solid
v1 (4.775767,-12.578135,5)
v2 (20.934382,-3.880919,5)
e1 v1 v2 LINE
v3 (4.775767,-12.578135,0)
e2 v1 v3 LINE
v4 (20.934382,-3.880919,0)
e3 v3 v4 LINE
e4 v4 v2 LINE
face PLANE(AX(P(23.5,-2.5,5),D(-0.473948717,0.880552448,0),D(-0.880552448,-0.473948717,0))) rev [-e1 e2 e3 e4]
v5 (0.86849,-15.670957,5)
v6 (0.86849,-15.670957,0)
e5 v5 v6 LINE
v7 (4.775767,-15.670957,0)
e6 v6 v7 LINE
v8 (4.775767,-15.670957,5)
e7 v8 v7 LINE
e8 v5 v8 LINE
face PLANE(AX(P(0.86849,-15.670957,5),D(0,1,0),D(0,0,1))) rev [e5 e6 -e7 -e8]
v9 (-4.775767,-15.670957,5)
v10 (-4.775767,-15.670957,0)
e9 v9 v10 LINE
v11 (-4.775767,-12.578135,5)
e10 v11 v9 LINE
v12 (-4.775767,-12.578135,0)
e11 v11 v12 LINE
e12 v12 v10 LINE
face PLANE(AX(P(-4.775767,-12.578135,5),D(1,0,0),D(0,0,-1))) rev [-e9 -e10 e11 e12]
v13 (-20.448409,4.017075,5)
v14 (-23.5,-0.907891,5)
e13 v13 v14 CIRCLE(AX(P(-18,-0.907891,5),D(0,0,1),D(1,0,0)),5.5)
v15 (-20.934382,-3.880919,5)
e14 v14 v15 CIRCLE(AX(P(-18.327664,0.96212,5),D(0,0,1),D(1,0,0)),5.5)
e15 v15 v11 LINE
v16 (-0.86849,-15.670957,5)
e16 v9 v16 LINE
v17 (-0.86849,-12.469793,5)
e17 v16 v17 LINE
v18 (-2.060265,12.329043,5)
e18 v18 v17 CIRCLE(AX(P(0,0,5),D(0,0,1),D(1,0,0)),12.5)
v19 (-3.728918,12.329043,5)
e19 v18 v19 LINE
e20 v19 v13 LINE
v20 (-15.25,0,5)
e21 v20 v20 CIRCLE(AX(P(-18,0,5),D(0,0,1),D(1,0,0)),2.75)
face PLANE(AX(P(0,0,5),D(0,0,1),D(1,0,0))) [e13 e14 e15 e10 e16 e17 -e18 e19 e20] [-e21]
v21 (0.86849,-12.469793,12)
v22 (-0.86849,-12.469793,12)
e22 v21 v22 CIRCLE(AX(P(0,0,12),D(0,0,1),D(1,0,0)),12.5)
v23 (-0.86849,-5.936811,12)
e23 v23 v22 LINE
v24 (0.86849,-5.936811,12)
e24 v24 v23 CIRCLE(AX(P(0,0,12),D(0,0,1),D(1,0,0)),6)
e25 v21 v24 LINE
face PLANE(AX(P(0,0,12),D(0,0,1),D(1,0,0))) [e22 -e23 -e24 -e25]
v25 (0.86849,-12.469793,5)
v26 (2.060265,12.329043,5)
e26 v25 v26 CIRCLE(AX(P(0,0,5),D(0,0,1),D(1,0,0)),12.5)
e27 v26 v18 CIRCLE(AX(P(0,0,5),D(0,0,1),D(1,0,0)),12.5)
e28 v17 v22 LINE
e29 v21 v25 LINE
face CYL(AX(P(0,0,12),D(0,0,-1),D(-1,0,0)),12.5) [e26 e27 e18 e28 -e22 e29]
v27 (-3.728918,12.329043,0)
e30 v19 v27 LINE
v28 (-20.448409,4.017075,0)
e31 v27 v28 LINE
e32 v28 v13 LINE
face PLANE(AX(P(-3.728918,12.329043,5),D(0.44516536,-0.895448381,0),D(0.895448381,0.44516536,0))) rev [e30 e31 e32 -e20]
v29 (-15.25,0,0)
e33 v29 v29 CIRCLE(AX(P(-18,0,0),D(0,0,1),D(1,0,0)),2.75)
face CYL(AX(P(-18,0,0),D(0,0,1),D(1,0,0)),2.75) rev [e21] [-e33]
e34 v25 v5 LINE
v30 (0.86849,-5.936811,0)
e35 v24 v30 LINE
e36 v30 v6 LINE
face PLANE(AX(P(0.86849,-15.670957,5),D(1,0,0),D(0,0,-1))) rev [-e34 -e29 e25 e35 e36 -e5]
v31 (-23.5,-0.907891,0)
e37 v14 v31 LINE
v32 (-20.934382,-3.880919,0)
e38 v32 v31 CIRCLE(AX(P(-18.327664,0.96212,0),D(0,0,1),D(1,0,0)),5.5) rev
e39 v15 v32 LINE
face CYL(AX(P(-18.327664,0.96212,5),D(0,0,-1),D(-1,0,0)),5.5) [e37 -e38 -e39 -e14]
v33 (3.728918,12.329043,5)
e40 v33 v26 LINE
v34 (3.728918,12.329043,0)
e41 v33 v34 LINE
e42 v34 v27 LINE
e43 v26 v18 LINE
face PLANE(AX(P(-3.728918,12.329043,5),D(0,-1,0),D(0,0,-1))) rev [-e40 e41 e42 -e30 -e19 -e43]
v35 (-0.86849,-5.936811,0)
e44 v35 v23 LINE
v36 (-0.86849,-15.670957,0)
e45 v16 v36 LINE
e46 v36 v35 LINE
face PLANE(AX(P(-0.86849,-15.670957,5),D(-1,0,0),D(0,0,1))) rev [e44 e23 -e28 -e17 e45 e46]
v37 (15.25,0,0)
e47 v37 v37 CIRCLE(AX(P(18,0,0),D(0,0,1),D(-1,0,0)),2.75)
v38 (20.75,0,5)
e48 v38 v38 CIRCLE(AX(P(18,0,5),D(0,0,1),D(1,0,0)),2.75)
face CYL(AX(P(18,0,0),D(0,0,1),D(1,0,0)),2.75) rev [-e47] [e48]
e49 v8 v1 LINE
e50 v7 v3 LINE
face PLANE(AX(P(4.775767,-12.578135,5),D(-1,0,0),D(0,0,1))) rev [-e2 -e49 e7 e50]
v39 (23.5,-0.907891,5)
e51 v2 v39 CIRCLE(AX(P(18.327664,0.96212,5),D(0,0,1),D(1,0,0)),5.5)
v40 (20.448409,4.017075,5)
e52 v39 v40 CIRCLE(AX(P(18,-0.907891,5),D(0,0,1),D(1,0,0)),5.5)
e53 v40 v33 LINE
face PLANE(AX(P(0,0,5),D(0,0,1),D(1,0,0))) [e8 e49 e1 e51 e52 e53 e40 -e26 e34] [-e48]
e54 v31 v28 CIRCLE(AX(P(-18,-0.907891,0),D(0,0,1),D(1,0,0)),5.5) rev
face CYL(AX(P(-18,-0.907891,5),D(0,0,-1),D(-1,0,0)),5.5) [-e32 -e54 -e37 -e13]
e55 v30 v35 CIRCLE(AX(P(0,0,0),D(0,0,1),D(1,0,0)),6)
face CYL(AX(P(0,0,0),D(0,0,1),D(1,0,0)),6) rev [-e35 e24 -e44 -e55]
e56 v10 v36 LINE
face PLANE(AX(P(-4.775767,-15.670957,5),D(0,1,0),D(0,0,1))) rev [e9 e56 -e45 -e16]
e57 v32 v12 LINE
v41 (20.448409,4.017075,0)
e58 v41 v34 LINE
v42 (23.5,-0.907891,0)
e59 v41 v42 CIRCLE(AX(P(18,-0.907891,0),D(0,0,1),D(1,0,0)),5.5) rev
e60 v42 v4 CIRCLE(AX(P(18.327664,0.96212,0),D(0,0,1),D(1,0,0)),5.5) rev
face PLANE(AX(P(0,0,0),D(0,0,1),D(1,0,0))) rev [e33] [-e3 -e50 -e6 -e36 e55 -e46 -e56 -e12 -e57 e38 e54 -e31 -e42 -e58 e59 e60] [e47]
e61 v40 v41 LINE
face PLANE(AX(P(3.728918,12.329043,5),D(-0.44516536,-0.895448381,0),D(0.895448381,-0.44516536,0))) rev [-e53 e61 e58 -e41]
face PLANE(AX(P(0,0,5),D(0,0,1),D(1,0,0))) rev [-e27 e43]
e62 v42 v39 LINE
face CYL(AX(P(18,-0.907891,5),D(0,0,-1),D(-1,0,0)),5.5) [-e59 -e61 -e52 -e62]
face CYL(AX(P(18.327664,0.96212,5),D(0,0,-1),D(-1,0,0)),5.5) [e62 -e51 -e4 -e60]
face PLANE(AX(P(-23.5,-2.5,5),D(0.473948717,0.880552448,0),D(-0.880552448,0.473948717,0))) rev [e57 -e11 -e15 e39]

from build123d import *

# Parameters (mm, degrees)
RESSALTO_EXTRUS_O1_DEPTH   = 5
ESBO_O3_R                  = 12.5
RESSALTO_EXTRUS_O2_DEPTH   = 7
CORTE_EXTRUS_O1_DEPTH      = 30.100324457
CORTE_EXTRUS_O1_DEPTH_BACK = 30.100324457
ESBO_O2_R                  = 6
ESBO_O2_R_2                = 2.75
FILETE8_R                  = 5.5
FILETE9_R                  = 5.5
FILETE10_R                 = 5.5
FILETE11_R                 = 5.5
CORTE_EXTRUS_O2_DEPTH      = 31.689230742
CORTE_EXTRUS_O2_DEPTH_BACK = 31.689230742
ESBO_O4_W                  = 1.736979024
ESBO_O4_H                  = 15.670956688


with BuildPart() as part:
    # Ressalto-extrusão1: read off the stored shape, not the designer's step
    # Ressalto-extrusão1 outline → Ressalto-extrusão1 (new body)
    with BuildSketch(Plane.XY):
        Polygon((4.775767162, -12.578134648), (23.5, -2.5), (23.5, 2.5), (3.728917801, 12.329043312), (-3.728917801, 12.329043312), (-23.5, 2.5), (-23.5, -2.5), (-4.775767162, -12.578134648), (-4.775767162, -15.670956688), (-0.868489512, -15.670956688), (-0.868489512, 0), (0.868489512, 0), (0.868489512, -15.670956688), (4.775767162, -15.670956688), align=None)
    extrude(amount=RESSALTO_EXTRUS_O1_DEPTH)

    # Esboço3 → Ressalto-extrusão2 (add)
    with BuildSketch(Plane.XY.offset(5)):
        with Locations(Location((0, 0, 0), (0, 0, 99.486846806))):
            Circle(ESBO_O3_R)
    extrude(amount=RESSALTO_EXTRUS_O2_DEPTH)

    # Esboço2 → Corte-extrusão1 (cut, two sides: drawn at the far end of the back side and taken through both)
    with BuildSketch(Plane.XY.offset(5).offset(-CORTE_EXTRUS_O1_DEPTH_BACK)):
        Circle(ESBO_O2_R)
        with Locations((-18, 0)):
            Circle(ESBO_O2_R_2)
        with Locations((18, 0)):
            Circle(ESBO_O2_R_2)
    extrude(amount=CORTE_EXTRUS_O1_DEPTH + CORTE_EXTRUS_O1_DEPTH_BACK, mode=Mode.SUBTRACT)

    # Filete8
    filete8_edges = [part.edges().sort_by_distance(p)[0] for p in [
        (-23.5, 2.5, 2.5),
    ]]
    fillet(filete8_edges, radius=FILETE8_R)

    # Filete9
    # the kernel refuses this fillet: 5.5 mm, written as the material it takes off along each edge
    with BuildSketch(Plane(origin=(-23.5, -2.5, -7.284114841), x_dir=(1.1558918030709584e-12, 1.0, 0), z_dir=(0, 0, 1))) as filete9_piece_1:
        with BuildLine():
            CenterArc((3.462119709, -5.172336006), FILETE9_R, 109.876993247, 41.832083594)
            Line((-1.380918754, -2.565618062), (-1.477779523, -2.513483703))
            Line((-1.477779523, -2.513483703), (-0.096860769, 0.052134359))
            Line((-0.096860769, 0.052134359), (0, 0.11))
            ThreePointArc((0, 0.11), (0.796054475, 0.11), (1.554708735, 0.10344672))
            Line((1.554708735, 0.10344672), (1.592108951, 0))
        make_face()
    extrude(amount=19.568229683, mode=Mode.SUBTRACT)

    # Filete10
    filete10_edges = [part.edges().sort_by_distance(p)[0] for p in [
        (23.5, 2.5, 2.5),
    ]]
    fillet(filete10_edges, radius=FILETE10_R)

    # Filete11
    # the kernel refuses this fillet: 5.5 mm, written as the material it takes off along each edge
    with BuildSketch(Plane(origin=(23.5, -2.5, -7.284114841), x_dir=(-1.1603547057855156e-12, 1.0, 0), z_dir=(0, 0, 1))) as filete11_piece_1:
        with BuildLine():
            CenterArc((3.462119709, 5.172336006), FILETE11_R, 208.290923159, 41.832083594)
            Line((-1.380918754, 2.565618062), (-1.477779523, 2.513483703))
            Line((-1.477779523, 2.513483703), (-0.096860769, -0.052134359))
            Line((-0.096860769, -0.052134359), (0, -0.11))
            ThreePointArc((0, -0.11), (0.796054475, -0.11), (1.554708735, -0.10344672))
            Line((1.554708735, -0.10344672), (1.592108951, 0))
        make_face()
    extrude(amount=19.568229683, mode=Mode.SUBTRACT)

    # Esboço4 → Corte-extrusão2 (cut, two sides: drawn at the far end of the back side and taken through both)
    with BuildSketch(Plane.XY.offset(12).offset(-CORTE_EXTRUS_O2_DEPTH_BACK)):
        with Locations((0, -7.835478344)):
            Rectangle(ESBO_O4_W, ESBO_O4_H)
    extrude(amount=CORTE_EXTRUS_O2_DEPTH + CORTE_EXTRUS_O2_DEPTH_BACK, mode=Mode.SUBTRACT)


solid = part.part
